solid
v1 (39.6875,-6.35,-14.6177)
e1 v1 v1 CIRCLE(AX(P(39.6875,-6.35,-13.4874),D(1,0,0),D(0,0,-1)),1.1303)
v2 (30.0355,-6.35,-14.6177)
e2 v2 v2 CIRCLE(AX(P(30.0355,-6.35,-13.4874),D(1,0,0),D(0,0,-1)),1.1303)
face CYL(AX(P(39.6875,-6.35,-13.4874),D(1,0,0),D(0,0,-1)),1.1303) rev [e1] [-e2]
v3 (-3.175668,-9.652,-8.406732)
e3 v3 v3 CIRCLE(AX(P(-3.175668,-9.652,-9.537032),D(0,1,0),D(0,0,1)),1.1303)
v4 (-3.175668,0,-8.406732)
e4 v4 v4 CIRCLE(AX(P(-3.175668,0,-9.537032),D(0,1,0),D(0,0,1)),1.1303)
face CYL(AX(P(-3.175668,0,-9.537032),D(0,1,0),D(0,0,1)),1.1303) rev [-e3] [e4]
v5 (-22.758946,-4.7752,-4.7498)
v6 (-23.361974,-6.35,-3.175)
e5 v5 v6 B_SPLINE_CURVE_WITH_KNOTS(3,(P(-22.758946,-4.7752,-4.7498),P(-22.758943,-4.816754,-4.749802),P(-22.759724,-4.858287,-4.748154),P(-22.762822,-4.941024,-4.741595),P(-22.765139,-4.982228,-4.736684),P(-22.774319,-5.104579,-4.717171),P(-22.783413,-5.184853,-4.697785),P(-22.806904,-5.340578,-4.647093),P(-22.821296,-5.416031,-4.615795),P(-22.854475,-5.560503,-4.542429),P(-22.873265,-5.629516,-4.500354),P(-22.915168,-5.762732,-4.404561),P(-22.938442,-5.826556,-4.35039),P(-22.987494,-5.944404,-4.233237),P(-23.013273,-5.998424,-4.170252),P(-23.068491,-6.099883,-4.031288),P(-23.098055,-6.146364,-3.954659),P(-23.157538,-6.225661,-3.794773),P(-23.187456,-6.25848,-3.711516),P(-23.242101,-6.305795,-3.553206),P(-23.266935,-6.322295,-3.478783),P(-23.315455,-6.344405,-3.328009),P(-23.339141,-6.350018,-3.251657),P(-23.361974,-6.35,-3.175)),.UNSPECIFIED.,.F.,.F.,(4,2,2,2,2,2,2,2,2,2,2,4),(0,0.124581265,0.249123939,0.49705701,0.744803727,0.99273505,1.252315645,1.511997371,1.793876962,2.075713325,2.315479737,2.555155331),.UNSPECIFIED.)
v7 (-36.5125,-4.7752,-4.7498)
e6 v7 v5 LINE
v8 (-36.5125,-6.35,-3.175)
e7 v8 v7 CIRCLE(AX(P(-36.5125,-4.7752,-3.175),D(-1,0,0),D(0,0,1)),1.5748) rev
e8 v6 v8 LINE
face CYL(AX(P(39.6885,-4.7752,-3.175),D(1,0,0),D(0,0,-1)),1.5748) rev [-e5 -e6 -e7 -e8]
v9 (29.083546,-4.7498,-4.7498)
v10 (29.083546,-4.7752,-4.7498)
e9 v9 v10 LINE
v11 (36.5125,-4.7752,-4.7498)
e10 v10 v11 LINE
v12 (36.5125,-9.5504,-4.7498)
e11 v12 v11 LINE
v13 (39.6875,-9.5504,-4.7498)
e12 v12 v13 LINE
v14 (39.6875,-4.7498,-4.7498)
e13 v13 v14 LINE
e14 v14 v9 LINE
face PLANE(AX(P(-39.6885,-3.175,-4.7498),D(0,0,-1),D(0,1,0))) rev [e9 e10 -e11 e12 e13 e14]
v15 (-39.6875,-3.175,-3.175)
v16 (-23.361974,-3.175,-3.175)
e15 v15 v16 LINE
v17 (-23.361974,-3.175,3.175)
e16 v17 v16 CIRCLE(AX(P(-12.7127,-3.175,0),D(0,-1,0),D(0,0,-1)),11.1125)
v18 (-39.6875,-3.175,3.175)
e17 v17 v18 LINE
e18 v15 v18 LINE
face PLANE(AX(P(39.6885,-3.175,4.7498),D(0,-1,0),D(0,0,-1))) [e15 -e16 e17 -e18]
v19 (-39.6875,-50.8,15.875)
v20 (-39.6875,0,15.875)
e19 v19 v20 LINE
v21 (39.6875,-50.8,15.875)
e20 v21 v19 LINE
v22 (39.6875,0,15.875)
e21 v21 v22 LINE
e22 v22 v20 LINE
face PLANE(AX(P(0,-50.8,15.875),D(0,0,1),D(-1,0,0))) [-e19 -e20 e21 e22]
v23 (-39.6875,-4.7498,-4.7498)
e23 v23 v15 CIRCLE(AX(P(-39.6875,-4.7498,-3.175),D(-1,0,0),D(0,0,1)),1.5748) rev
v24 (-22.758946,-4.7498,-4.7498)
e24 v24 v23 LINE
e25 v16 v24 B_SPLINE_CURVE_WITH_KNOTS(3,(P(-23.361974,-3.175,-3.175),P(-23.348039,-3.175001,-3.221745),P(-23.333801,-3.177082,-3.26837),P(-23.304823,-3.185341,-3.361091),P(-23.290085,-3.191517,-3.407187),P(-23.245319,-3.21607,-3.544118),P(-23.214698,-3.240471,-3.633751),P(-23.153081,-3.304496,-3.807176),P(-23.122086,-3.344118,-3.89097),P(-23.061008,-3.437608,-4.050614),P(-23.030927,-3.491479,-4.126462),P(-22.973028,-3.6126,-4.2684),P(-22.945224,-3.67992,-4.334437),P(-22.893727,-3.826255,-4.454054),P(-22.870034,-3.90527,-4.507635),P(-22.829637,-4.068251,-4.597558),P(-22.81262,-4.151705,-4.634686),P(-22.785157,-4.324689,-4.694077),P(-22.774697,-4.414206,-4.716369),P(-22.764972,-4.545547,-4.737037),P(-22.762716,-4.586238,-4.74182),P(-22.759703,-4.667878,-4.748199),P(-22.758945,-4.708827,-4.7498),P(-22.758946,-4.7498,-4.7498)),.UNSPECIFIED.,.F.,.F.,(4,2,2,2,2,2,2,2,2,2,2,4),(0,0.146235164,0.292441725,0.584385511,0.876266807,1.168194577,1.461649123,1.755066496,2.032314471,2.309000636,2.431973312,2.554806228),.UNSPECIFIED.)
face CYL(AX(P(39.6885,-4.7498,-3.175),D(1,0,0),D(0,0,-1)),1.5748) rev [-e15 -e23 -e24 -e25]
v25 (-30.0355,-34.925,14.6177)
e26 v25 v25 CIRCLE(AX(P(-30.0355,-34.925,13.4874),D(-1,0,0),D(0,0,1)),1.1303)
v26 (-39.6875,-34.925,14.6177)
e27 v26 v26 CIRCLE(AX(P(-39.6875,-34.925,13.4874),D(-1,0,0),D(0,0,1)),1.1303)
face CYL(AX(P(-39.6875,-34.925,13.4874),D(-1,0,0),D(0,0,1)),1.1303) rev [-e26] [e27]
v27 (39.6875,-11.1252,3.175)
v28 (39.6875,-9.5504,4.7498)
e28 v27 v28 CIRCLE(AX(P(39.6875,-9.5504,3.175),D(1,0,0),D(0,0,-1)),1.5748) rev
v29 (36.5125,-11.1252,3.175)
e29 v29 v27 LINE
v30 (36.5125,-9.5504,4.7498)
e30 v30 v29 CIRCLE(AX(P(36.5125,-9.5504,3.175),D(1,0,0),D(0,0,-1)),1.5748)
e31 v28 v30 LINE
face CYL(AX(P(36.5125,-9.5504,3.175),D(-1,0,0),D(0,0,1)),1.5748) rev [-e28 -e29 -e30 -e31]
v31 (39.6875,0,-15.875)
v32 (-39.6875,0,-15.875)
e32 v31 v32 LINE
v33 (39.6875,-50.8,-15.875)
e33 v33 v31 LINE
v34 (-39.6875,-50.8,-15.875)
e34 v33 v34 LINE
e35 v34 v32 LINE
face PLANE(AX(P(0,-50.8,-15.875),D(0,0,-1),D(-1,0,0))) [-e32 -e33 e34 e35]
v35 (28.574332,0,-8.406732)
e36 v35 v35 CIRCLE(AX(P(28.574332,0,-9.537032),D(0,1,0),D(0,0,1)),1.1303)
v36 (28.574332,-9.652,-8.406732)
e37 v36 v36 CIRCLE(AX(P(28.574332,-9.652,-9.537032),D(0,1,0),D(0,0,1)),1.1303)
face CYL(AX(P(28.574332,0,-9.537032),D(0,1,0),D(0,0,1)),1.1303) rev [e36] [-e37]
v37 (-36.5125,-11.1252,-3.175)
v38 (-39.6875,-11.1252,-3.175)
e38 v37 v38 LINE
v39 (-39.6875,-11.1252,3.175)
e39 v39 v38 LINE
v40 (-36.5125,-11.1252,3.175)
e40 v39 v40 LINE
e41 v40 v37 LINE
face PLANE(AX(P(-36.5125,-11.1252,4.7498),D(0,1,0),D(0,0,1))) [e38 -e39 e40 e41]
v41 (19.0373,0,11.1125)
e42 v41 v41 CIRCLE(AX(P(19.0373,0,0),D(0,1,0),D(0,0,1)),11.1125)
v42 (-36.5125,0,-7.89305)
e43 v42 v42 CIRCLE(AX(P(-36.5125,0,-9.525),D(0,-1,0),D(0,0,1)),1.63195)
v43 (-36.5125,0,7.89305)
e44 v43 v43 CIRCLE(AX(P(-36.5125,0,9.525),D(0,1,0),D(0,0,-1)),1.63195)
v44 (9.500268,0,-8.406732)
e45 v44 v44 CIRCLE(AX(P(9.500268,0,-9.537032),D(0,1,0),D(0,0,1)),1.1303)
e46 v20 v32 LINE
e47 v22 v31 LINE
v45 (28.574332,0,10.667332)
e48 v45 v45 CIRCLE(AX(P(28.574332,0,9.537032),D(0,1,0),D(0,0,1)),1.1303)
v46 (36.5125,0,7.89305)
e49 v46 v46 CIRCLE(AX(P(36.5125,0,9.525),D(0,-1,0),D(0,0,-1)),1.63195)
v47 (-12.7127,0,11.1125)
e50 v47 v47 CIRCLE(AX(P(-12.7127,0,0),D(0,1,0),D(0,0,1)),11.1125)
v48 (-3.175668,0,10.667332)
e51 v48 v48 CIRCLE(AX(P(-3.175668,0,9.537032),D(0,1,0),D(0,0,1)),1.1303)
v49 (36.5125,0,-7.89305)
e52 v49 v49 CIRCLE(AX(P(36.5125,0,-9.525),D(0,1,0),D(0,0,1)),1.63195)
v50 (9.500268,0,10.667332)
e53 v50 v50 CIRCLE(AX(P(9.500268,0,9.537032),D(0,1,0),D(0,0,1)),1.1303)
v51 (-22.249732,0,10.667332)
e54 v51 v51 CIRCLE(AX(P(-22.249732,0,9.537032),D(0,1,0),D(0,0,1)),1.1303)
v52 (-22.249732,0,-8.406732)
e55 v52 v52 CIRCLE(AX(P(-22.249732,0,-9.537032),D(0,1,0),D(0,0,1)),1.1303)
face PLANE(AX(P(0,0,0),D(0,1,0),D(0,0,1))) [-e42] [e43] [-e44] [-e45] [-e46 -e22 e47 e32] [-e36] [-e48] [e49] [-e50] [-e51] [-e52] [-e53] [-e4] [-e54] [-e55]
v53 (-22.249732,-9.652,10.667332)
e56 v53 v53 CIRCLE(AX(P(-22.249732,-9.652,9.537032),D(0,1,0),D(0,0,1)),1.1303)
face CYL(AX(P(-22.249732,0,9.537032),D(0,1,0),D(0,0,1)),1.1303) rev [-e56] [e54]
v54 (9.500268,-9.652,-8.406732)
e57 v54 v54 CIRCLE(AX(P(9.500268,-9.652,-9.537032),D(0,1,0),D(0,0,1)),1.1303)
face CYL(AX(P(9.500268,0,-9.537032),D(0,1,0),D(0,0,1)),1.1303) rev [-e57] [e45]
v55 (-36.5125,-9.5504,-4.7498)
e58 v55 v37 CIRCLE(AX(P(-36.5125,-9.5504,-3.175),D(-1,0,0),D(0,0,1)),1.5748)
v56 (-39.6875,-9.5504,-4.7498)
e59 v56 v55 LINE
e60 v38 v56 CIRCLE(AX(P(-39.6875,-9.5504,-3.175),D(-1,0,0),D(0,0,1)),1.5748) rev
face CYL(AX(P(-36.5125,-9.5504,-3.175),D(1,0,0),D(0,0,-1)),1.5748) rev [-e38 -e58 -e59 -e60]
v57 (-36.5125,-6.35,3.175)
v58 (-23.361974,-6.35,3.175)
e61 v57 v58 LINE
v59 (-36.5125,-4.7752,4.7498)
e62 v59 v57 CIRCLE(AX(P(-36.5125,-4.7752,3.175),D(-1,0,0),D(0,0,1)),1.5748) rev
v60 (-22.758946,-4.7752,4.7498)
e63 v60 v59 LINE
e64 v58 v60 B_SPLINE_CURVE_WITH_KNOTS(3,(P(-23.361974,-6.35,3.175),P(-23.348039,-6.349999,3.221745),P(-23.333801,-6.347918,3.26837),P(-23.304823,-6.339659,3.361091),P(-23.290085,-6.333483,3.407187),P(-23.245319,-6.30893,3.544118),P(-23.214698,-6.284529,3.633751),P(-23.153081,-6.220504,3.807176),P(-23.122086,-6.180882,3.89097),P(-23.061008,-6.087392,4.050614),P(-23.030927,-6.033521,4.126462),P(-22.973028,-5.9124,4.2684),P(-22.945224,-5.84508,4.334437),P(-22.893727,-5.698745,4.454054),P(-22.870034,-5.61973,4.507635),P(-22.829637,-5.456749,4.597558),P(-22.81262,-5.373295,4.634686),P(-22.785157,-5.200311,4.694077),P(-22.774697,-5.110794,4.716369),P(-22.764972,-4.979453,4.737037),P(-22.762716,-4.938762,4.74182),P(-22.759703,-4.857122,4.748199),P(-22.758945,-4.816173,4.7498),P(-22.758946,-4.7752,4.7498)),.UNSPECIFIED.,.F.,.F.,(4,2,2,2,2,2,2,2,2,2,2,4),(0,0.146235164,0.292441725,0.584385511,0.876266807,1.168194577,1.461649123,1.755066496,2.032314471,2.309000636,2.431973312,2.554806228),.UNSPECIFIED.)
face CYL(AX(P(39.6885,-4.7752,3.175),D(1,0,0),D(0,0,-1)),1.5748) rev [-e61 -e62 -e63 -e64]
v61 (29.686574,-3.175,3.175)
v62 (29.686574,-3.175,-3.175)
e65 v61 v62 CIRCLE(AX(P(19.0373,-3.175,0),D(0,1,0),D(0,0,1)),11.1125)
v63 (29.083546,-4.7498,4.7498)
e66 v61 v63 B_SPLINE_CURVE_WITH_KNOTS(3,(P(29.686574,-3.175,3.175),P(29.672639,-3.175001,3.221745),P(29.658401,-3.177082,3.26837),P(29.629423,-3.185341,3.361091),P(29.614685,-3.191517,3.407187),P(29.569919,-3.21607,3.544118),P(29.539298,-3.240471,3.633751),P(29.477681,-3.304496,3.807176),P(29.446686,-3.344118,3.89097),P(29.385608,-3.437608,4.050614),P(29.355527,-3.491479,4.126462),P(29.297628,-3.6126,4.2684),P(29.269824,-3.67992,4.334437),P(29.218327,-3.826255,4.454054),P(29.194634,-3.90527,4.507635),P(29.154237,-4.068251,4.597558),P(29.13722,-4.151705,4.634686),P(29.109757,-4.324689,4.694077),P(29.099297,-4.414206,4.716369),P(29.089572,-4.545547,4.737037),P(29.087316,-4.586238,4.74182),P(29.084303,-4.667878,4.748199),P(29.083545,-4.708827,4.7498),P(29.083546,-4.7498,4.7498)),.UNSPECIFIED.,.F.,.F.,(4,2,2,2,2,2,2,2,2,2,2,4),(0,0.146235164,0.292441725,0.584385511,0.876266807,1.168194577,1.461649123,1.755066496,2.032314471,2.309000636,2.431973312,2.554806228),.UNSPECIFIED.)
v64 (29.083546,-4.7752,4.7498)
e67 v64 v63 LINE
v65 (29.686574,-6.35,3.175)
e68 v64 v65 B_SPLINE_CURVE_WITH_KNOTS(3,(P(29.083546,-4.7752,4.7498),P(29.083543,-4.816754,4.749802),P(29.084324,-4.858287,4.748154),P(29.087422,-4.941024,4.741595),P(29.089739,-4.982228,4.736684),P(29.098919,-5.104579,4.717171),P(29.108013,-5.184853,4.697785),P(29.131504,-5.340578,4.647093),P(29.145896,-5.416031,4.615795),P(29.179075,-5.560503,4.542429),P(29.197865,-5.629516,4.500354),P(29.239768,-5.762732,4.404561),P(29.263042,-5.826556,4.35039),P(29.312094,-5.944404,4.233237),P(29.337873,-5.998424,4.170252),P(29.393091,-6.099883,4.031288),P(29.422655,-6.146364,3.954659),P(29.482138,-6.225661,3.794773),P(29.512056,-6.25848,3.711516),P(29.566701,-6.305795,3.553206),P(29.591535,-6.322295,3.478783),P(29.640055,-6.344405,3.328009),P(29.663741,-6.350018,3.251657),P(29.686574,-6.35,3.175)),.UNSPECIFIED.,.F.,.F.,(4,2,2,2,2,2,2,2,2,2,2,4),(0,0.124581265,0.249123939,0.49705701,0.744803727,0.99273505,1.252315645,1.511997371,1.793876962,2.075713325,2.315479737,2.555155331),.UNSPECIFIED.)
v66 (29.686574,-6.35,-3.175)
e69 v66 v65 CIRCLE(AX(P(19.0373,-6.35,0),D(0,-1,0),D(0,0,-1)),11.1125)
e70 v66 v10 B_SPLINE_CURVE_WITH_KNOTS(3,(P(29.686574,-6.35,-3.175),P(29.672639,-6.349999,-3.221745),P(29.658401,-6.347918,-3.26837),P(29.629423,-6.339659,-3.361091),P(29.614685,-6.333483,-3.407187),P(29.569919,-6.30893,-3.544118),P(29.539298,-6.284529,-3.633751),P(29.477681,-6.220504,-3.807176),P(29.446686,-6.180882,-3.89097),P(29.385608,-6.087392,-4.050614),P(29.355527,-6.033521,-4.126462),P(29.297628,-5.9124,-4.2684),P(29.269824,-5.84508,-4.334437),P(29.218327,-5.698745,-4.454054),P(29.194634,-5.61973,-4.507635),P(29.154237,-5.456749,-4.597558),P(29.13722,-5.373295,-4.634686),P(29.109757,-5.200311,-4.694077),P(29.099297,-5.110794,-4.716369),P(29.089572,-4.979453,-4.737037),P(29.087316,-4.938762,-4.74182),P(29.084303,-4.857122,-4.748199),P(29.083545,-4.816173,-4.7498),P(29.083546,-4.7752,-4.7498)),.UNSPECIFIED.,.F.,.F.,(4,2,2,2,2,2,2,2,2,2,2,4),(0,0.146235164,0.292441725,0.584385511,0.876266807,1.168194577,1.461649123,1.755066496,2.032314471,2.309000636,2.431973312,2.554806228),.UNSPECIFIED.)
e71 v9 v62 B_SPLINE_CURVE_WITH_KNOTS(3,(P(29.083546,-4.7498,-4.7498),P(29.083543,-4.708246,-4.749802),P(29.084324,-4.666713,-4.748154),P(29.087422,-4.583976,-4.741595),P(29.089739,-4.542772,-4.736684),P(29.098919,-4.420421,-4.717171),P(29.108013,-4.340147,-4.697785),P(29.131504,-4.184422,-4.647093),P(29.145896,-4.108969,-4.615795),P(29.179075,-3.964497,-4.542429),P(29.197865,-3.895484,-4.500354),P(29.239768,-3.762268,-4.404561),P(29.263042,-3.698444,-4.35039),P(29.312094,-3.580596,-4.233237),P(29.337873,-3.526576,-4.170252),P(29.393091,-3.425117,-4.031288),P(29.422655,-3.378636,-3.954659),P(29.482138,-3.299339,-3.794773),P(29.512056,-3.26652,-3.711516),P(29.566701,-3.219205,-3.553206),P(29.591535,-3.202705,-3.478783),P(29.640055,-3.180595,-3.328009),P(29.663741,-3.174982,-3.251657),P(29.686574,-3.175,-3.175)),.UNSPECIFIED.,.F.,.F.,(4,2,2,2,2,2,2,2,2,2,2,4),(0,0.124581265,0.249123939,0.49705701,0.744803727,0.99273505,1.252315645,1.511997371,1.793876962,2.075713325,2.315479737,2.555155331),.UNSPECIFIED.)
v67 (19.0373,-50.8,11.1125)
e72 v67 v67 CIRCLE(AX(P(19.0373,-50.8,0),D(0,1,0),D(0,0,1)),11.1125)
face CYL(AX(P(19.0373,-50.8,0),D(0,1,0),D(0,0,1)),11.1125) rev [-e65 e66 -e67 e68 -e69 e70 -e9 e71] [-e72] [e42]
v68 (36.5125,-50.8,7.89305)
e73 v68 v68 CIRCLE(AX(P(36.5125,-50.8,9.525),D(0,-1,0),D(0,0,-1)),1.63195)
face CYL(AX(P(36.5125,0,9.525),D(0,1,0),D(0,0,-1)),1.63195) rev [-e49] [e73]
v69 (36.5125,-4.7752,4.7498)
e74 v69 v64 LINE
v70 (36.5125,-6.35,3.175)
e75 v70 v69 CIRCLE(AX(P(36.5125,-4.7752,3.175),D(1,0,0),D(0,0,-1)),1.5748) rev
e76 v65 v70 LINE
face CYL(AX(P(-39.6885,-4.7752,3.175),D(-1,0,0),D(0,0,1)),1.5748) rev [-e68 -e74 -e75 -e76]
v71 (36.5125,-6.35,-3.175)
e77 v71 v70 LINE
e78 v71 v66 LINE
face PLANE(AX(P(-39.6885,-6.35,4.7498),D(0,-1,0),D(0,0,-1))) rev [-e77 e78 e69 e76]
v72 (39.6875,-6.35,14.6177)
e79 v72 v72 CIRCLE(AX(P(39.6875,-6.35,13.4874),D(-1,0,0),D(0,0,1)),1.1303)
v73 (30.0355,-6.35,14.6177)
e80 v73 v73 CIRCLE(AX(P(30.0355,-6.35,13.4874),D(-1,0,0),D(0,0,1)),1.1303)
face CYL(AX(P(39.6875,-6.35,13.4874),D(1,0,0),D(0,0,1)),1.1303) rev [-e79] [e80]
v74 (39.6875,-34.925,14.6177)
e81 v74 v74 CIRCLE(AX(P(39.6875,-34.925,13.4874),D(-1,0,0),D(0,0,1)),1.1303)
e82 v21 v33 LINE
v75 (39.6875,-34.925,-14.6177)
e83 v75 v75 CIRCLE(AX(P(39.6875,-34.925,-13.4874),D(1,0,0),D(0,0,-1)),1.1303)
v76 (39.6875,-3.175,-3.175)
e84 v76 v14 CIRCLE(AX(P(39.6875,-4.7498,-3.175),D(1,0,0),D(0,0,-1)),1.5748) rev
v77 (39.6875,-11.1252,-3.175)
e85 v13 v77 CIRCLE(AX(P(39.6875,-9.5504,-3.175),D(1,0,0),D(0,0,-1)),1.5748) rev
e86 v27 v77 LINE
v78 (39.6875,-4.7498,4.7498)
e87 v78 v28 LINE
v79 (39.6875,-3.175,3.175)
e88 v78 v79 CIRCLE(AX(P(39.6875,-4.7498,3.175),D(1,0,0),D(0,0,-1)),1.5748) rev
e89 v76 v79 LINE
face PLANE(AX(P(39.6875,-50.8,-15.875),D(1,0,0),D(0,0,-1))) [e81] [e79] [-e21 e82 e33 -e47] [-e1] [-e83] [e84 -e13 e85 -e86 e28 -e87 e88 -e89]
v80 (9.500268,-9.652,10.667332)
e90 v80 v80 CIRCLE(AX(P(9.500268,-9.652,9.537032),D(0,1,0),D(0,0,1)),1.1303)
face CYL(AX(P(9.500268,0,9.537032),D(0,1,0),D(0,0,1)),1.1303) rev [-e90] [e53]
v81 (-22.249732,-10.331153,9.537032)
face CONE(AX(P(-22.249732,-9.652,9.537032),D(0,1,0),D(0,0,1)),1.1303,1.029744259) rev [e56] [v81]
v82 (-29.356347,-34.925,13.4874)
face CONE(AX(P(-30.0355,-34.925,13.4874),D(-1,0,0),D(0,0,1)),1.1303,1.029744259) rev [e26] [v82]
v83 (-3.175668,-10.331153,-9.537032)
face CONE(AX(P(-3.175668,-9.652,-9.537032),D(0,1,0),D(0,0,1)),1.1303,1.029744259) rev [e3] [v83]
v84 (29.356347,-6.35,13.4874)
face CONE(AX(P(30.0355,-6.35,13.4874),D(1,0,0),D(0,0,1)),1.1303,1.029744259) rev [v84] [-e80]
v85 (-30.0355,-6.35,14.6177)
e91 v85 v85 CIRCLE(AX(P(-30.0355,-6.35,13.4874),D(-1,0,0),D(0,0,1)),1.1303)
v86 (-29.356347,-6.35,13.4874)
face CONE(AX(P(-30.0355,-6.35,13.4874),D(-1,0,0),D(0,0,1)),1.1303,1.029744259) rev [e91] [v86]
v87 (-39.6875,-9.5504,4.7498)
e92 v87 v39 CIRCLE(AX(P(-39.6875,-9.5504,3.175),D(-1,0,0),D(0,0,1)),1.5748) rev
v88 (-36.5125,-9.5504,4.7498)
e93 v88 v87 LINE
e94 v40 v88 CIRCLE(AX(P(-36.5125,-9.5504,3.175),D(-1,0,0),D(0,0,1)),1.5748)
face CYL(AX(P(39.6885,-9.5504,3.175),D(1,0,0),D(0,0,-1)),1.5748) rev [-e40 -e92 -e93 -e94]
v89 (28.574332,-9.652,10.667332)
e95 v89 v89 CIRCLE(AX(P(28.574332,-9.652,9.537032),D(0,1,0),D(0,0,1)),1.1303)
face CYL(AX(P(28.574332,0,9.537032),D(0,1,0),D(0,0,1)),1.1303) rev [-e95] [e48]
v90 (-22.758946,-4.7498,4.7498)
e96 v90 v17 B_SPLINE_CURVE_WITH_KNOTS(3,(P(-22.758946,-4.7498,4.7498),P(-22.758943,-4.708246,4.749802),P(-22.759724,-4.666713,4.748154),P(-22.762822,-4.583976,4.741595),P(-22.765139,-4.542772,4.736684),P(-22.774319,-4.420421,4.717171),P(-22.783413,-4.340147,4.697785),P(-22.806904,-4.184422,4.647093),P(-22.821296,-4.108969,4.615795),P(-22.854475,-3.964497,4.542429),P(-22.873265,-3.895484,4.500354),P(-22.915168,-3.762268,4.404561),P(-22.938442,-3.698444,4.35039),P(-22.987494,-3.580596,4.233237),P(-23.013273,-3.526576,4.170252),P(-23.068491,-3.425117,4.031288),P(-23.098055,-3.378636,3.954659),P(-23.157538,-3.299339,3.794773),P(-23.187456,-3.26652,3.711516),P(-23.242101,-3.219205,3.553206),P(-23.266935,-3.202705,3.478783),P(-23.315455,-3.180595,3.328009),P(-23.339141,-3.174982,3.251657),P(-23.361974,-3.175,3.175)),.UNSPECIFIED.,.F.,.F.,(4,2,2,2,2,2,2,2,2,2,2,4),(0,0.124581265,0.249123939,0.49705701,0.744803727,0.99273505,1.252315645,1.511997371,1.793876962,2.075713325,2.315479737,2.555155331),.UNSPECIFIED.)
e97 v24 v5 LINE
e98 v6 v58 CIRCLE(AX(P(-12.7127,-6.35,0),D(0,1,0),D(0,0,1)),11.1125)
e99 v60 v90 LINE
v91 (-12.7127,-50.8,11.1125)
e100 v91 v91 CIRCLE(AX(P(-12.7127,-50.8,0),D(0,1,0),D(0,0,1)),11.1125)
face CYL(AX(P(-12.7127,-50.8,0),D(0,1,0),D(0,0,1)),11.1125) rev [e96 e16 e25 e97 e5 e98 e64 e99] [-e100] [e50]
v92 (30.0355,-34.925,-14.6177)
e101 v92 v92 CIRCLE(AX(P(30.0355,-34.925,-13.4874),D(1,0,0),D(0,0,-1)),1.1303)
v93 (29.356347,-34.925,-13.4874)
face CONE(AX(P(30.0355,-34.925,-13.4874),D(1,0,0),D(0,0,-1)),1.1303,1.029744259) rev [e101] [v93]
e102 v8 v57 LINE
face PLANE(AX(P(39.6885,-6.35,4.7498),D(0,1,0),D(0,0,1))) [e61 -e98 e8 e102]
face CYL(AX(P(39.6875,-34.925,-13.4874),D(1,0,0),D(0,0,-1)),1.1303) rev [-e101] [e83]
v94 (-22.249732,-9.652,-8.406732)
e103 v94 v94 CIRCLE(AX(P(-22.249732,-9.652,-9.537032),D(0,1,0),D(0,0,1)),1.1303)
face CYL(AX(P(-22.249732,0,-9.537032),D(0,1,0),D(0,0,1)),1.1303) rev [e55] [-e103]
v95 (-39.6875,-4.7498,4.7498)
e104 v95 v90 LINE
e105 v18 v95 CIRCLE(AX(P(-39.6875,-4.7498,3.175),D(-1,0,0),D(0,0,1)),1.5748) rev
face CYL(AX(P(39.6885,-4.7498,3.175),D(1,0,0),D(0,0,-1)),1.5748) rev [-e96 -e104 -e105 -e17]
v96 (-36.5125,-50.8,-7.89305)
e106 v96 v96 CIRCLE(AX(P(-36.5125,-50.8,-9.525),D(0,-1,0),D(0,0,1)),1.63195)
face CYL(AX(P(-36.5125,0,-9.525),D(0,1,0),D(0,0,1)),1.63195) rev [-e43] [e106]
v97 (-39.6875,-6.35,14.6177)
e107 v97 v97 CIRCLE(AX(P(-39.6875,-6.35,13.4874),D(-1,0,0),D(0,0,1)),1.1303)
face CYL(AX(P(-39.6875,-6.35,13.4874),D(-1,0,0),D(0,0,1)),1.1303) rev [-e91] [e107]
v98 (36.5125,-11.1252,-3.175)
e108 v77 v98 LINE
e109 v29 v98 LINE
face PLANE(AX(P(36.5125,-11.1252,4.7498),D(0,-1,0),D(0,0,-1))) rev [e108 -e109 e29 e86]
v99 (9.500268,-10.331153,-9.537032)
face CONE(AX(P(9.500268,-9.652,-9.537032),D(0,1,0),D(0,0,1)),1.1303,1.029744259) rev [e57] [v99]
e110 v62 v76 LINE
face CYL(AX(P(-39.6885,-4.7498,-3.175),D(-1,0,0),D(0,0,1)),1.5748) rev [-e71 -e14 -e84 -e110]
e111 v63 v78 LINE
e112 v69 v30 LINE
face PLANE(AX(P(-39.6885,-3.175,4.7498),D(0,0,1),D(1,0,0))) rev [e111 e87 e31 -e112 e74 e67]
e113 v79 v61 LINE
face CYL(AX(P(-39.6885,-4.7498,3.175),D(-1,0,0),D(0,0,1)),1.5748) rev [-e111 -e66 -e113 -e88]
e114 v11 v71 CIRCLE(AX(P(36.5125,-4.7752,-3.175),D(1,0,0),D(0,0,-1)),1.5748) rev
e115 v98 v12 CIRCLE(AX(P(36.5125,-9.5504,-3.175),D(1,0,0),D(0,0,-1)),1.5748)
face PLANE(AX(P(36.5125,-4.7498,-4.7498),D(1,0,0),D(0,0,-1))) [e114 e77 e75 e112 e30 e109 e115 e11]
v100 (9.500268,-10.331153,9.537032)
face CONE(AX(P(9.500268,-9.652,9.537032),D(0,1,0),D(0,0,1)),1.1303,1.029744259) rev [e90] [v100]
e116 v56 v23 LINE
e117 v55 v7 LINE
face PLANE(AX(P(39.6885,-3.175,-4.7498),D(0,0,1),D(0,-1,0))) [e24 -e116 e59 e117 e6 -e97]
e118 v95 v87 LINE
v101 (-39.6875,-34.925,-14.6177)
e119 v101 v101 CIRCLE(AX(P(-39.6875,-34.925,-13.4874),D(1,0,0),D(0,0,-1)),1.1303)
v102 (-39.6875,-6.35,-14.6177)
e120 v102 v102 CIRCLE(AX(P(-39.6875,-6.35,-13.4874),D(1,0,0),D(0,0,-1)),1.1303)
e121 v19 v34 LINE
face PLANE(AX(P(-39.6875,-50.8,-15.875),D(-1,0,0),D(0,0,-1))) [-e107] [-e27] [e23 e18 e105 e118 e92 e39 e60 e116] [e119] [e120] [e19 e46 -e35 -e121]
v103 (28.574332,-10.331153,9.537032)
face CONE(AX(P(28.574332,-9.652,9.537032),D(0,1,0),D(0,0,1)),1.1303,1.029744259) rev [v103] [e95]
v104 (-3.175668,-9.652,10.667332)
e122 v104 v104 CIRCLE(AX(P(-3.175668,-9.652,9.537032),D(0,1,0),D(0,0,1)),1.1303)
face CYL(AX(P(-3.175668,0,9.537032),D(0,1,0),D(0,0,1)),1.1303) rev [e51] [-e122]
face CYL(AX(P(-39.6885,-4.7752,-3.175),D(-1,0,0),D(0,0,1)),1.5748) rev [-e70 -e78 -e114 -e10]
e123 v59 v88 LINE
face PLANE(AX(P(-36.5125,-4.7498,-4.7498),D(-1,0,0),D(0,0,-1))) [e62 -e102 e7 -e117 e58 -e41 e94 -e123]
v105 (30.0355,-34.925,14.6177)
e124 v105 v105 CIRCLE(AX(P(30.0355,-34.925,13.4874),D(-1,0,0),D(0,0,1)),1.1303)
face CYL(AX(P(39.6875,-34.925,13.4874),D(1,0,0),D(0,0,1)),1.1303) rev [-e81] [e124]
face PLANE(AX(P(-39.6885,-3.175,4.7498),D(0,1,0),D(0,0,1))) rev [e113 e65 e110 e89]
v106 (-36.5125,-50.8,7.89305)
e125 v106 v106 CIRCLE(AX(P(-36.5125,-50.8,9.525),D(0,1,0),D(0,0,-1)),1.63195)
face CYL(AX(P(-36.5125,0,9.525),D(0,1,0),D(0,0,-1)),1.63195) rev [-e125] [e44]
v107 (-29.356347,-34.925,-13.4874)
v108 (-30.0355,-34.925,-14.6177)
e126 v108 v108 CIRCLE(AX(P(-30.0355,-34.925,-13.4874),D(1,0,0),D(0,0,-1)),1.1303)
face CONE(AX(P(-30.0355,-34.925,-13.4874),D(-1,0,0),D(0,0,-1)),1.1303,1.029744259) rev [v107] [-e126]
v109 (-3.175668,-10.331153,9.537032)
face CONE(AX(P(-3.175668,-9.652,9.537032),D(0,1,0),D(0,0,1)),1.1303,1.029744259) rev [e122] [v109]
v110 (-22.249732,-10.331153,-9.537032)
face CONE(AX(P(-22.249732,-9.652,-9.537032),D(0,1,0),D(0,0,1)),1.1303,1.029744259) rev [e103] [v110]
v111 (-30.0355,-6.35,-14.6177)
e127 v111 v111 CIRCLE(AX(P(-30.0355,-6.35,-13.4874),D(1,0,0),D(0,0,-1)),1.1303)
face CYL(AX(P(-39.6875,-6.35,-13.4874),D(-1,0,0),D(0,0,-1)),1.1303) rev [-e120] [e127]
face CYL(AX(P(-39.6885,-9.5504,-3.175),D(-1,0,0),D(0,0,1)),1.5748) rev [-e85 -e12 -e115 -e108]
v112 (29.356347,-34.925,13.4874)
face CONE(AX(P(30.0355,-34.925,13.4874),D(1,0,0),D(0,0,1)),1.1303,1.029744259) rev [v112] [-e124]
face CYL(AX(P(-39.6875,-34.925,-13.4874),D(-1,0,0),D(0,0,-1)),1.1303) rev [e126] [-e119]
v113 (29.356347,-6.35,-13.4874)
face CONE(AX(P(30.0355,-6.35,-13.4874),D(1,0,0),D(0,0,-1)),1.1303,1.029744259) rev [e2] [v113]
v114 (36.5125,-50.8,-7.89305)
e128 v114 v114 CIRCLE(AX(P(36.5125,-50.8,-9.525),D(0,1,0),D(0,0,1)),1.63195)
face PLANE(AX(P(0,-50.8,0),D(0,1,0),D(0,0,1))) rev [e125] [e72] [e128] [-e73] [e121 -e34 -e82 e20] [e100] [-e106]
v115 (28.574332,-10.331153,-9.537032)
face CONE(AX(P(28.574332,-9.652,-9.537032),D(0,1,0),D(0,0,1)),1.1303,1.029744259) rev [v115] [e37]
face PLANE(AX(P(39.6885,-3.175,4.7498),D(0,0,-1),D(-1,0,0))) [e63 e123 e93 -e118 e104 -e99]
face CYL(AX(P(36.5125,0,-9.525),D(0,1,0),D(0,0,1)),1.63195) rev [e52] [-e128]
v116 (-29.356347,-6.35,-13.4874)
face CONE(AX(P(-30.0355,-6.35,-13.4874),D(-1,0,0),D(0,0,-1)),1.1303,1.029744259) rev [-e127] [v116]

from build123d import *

# Parameters (mm, degrees)
SKETCH1_W                      = 39.6875
SKETCH1_H                      = 15.875
BOSS_EXTRUDE1_DEPTH            = 50.8
F_30_0_1285_DIAMETER_HOLE1_D   = 3.2639
F_4_40_TAPPED_HOLE1_D          = 2.2606
F_4_40_TAPPED_HOLE1_DEPTH      = 9.652
F_4_40_TAPPED_HOLE1_TIP        = 0.679152758
SKETCH7_R                      = 11.1125
CUT_EXTRUDE1_DEPTH             = 67.390912641
F_4_40_TAPPED_HOLE2_AT_2_COUNT = 2
F_4_40_TAPPED_HOLE2_AT_2_PITCH = 19.074064001
F_4_40_TAPPED_HOLE2_AT_3_COUNT = 2
F_4_40_TAPPED_HOLE2_AT_3_PITCH = 26.9748
F_4_40_TAPPED_HOLE2_AT_4_COUNT = 2
F_4_40_TAPPED_HOLE2_AT_4_PITCH = 19.074064001
LPATTERN1_COUNT                = 2
LPATTERN1_PITCH                = 31.75
CUT_EXTRUDE2_REACH             = 97.567
CUT_EXTRUDE2_END_RADIUS        = 11.1125
SKETCH10_W                     = 9.4996
SKETCH10_H                     = 3.175
FILLET1_R                      = 1.5748
SKETCH11_W                     = 9.4996
SKETCH11_H                     = 6.3754
CUT_EXTRUDE3_DEPTH             = 3.175
FILLET2_R                      = 1.5748
MIRROR3_START                  = -39.6875
MIRROR3_DEPTH                  = 16.928554124
MIRROR3_2_DEPTH                = 3.175


# Read off the part's stored shape, not the designer's step: Mirror3
with BuildPart() as part:
    # Sketch1 → Boss-Extrude1 (new body)
    with BuildSketch(Plane(origin=(0, 0, 0), x_dir=(1, 0, 0), z_dir=(0, 1, 0))):
        with Locations((19.84375, 7.9375)):
            Rectangle(SKETCH1_W, SKETCH1_H)
    extrude(amount=-BOSS_EXTRUDE1_DEPTH)

    # #30 (0.1285) Diameter Hole1 (through all)
    with Locations(Plane(origin=(0, 0, 0), x_dir=(-1, 0, 0), z_dir=(0, 1, 0))):
        with Locations((-36.5125, -9.525)):
            Hole(F_30_0_1285_DIAMETER_HOLE1_D / 2)

    # #4-40 Tapped Hole1
    with Locations(Plane(origin=(39.6875, 0, 0), x_dir=(0, 0, -1), z_dir=(1, 0, 0))):
        with Locations((13.4874, -6.35), (13.4874, -34.925)):
            Hole(F_4_40_TAPPED_HOLE1_D / 2, depth=F_4_40_TAPPED_HOLE1_DEPTH)
            with Locations((0, 0, -(F_4_40_TAPPED_HOLE1_DEPTH + F_4_40_TAPPED_HOLE1_TIP / 2))):  # 118° drill point
                Cone(0, F_4_40_TAPPED_HOLE1_D / 2, F_4_40_TAPPED_HOLE1_TIP, mode=Mode.SUBTRACT)

    # Mirror1: part across plane


with BuildPart() as part_1:
    add(part.part)
    add(part.part.mirror(Plane(origin=(0, -50.8, 0), x_dir=(1, 0, 0), z_dir=(0, 0, 1))))

    # Mirror2: part across plane


with BuildPart() as part_2:
    add(part_1.part)
    add(part_1.part.mirror(Plane(origin=(0, -50.8, -15.875), x_dir=(0, 0, 1), z_dir=(-1, 0, 0))))

    # Sketch7 → Cut-Extrude1 (cut, through all)
    with BuildSketch(Plane(origin=(0, 0, 0), x_dir=(-1, 0, 0), z_dir=(0, 1, 0))):
        with Locations(Location((-19.0373, 0, 0), (0, 0, 90))):
            Circle(SKETCH7_R)
    cut_extrude1 = extrude(amount=-CUT_EXTRUDE1_DEPTH, mode=Mode.SUBTRACT)

    # Sketch8 → #4-40 Tapped Hole2 (revolve, cut)
    with BuildSketch(Plane(origin=(9.500267999, 0, -9.537032001), x_dir=(0, 0, 1), z_dir=(1, 0, 0))):
        Polygon((0, 0), (0, 10.331152758), (1.1303, 9.652), (1.1303, 0), align=None)
    f_4_40_tapped_hole2 = revolve(axis=Axis((9.500267999, 6.35, -9.537032001), (0, -1, 0)), mode=Mode.SUBTRACT)

    # #4-40 Tapped Hole2 at 2: #4-40 Tapped Hole2 ×2
    with Locations(*[(i * F_4_40_TAPPED_HOLE2_AT_2_PITCH, 0, 0) for i in range(1, F_4_40_TAPPED_HOLE2_AT_2_COUNT)]):
        add(f_4_40_tapped_hole2, mode=Mode.SUBTRACT)

    # #4-40 Tapped Hole2 at 3: #4-40 Tapped Hole2 ×2
    with Locations(*[Vector(0.7071067811865515, 0, 0.7071067811865436) * (i * F_4_40_TAPPED_HOLE2_AT_3_PITCH) for i in range(1, F_4_40_TAPPED_HOLE2_AT_3_COUNT)]):
        add(f_4_40_tapped_hole2, mode=Mode.SUBTRACT)

    # #4-40 Tapped Hole2 at 4: #4-40 Tapped Hole2 ×2
    with Locations(*[(0, 0, i * F_4_40_TAPPED_HOLE2_AT_4_PITCH) for i in range(1, F_4_40_TAPPED_HOLE2_AT_4_COUNT)]):
        add(f_4_40_tapped_hole2, mode=Mode.SUBTRACT)

    # LPattern1: Cut-Extrude1, #4-40 Tapped Hole2 ×2
    with Locations(*[(-i * LPATTERN1_PITCH, 0, 0) for i in range(1, LPATTERN1_COUNT)]):
        add(cut_extrude1, mode=Mode.SUBTRACT)
        add(f_4_40_tapped_hole2, mode=Mode.SUBTRACT)

    # LPattern1 copy 1 sketch → LPattern1 copy 1 (revolve, cut)
    with BuildSketch(Plane(origin=(-3.175667999, 0, -9.537032001), x_dir=(0, 0, 1), z_dir=(1, 0, 0))):
        Polygon((0, 0), (0, 10.331152758), (1.1303, 9.652), (1.1303, 0), align=None)
    revolve(axis=Axis((-3.175667999, 6.35, -9.537032001), (0, -1, 0)), mode=Mode.SUBTRACT)

    # LPattern1 copy 2 sketch → LPattern1 copy 2 (revolve, cut)
    with BuildSketch(Plane(origin=(-3.175667999, 0, 9.537032001), x_dir=(0, 0, 1), z_dir=(1, 0, 0))):
        Polygon((0, 0), (0, 10.331152758), (1.1303, 9.652), (1.1303, 0), align=None)
    revolve(axis=Axis((-3.175667999, 6.35, 9.537032001), (0, -1, 0)), mode=Mode.SUBTRACT)

    # LPattern1 copy 3 sketch → LPattern1 copy 3 (revolve, cut)
    with BuildSketch(Plane(origin=(-22.249732001, 0, 9.537032001), x_dir=(0, 0, 1), z_dir=(1, 0, 0))):
        Polygon((0, 0), (0, 10.331152758), (1.1303, 9.652), (1.1303, 0), align=None)
    revolve(axis=Axis((-22.249732001, 6.35, 9.537032001), (0, -1, 0)), mode=Mode.SUBTRACT)

    # Cut-Extrude2: up to this cylinder (the profile starts outside it)
    cut_extrude2_end = Plane(origin=(19.0373, -4.7625, 0), z_dir=(0, 1, 0)) * Cylinder(CUT_EXTRUDE2_END_RADIUS, 218.359, mode=Mode.PRIVATE)
    # Sketch10 → Cut-Extrude2 (cut, up to the surface)
    with BuildSketch(Plane(origin=(39.6875, 0, 0), x_dir=(0, 0, -1), z_dir=(1, 0, 0)), mode=Mode.PRIVATE) as cut_extrude2_sk1:
        with Locations((0, -4.7625)):
            Rectangle(SKETCH10_W, SKETCH10_H)
    cut_extrude2_tool1 = extrude(cut_extrude2_sk1.sketch, amount=-CUT_EXTRUDE2_REACH, mode=Mode.PRIVATE) - cut_extrude2_end
    add(cut_extrude2_tool1.solids().sort_by_distance((39.6875, -4.7625, 0))[0], mode=Mode.SUBTRACT)

    # Fillet1
    fillet1_edges = [part_2.edges().sort_by_distance(p)[0] for p in [
        (34.385522938, -6.35, 4.7498),
        (34.385522938, -3.175, 4.7498),
        (34.385522938, -3.175, -4.7498),
        (34.385522938, -6.35, -4.7498),
    ]]
    fillet(fillet1_edges, radius=FILLET1_R)

    # Sketch11 → Cut-Extrude3 (cut)
    with BuildSketch(Plane(origin=(39.6875, 0, 0), x_dir=(0, 0, -1), z_dir=(1, 0, 0))):
        with Locations((0, -7.9375)):
            Rectangle(SKETCH11_W, SKETCH11_H)
    extrude(amount=-CUT_EXTRUDE3_DEPTH, mode=Mode.SUBTRACT)

    # Fillet2
    fillet2_edges = [part_2.edges().sort_by_distance(p)[0] for p in [
        (38.1, -11.1252, -4.7498),
        (38.1, -11.1252, 4.7498),
    ]]
    fillet(fillet2_edges, radius=FILLET2_R)

    # Mirror3 outline → Mirror3 (cut)
    with BuildSketch(Plane.YZ.offset(MIRROR3_START)):
        with BuildLine():
            Line((-6.35, 3.175), (-6.35, -3.175))
            ThreePointArc((-6.35, -3.175), (-5.888751759, -4.288551759), (-4.7752, -4.7498))
            Line((-4.7752, -4.7498), (-4.7498, -4.7498))
            ThreePointArc((-4.7498, -4.7498), (-3.636248241, -4.288551759), (-3.175, -3.175))
            Line((-3.175, -3.175), (-3.175, 3.175))
            ThreePointArc((-3.175, 3.175), (-3.636248241, 4.288551759), (-4.7498, 4.7498))
            Line((-4.7498, 4.7498), (-4.7752, 4.7498))
            ThreePointArc((-4.7752, 4.7498), (-5.888751759, 4.288551759), (-6.35, 3.175))
        make_face()
    extrude(amount=MIRROR3_DEPTH, mode=Mode.SUBTRACT)

    # Mirror3 2 outline → Mirror3 2 (cut)
    with BuildSketch(Plane.YZ.offset(MIRROR3_START)):
        with BuildLine():
            ThreePointArc((-4.7752, -4.7498), (-5.888751759, -4.288551759), (-6.35, -3.175))
            Line((-6.35, -3.175), (-6.35, 3.175))
            ThreePointArc((-6.35, 3.175), (-5.888751759, 4.288551759), (-4.7752, 4.7498))
            Line((-4.7752, 4.7498), (-9.5504, 4.7498))
            ThreePointArc((-9.5504, 4.7498), (-10.663951759, 4.288551759), (-11.1252, 3.175))
            Line((-11.1252, 3.175), (-11.1252, -3.175))
            ThreePointArc((-11.1252, -3.175), (-10.663951759, -4.288551759), (-9.5504, -4.7498))
            Line((-9.5504, -4.7498), (-4.7752, -4.7498))
        make_face()
    extrude(amount=MIRROR3_2_DEPTH, mode=Mode.SUBTRACT)


solid = part_2.part
